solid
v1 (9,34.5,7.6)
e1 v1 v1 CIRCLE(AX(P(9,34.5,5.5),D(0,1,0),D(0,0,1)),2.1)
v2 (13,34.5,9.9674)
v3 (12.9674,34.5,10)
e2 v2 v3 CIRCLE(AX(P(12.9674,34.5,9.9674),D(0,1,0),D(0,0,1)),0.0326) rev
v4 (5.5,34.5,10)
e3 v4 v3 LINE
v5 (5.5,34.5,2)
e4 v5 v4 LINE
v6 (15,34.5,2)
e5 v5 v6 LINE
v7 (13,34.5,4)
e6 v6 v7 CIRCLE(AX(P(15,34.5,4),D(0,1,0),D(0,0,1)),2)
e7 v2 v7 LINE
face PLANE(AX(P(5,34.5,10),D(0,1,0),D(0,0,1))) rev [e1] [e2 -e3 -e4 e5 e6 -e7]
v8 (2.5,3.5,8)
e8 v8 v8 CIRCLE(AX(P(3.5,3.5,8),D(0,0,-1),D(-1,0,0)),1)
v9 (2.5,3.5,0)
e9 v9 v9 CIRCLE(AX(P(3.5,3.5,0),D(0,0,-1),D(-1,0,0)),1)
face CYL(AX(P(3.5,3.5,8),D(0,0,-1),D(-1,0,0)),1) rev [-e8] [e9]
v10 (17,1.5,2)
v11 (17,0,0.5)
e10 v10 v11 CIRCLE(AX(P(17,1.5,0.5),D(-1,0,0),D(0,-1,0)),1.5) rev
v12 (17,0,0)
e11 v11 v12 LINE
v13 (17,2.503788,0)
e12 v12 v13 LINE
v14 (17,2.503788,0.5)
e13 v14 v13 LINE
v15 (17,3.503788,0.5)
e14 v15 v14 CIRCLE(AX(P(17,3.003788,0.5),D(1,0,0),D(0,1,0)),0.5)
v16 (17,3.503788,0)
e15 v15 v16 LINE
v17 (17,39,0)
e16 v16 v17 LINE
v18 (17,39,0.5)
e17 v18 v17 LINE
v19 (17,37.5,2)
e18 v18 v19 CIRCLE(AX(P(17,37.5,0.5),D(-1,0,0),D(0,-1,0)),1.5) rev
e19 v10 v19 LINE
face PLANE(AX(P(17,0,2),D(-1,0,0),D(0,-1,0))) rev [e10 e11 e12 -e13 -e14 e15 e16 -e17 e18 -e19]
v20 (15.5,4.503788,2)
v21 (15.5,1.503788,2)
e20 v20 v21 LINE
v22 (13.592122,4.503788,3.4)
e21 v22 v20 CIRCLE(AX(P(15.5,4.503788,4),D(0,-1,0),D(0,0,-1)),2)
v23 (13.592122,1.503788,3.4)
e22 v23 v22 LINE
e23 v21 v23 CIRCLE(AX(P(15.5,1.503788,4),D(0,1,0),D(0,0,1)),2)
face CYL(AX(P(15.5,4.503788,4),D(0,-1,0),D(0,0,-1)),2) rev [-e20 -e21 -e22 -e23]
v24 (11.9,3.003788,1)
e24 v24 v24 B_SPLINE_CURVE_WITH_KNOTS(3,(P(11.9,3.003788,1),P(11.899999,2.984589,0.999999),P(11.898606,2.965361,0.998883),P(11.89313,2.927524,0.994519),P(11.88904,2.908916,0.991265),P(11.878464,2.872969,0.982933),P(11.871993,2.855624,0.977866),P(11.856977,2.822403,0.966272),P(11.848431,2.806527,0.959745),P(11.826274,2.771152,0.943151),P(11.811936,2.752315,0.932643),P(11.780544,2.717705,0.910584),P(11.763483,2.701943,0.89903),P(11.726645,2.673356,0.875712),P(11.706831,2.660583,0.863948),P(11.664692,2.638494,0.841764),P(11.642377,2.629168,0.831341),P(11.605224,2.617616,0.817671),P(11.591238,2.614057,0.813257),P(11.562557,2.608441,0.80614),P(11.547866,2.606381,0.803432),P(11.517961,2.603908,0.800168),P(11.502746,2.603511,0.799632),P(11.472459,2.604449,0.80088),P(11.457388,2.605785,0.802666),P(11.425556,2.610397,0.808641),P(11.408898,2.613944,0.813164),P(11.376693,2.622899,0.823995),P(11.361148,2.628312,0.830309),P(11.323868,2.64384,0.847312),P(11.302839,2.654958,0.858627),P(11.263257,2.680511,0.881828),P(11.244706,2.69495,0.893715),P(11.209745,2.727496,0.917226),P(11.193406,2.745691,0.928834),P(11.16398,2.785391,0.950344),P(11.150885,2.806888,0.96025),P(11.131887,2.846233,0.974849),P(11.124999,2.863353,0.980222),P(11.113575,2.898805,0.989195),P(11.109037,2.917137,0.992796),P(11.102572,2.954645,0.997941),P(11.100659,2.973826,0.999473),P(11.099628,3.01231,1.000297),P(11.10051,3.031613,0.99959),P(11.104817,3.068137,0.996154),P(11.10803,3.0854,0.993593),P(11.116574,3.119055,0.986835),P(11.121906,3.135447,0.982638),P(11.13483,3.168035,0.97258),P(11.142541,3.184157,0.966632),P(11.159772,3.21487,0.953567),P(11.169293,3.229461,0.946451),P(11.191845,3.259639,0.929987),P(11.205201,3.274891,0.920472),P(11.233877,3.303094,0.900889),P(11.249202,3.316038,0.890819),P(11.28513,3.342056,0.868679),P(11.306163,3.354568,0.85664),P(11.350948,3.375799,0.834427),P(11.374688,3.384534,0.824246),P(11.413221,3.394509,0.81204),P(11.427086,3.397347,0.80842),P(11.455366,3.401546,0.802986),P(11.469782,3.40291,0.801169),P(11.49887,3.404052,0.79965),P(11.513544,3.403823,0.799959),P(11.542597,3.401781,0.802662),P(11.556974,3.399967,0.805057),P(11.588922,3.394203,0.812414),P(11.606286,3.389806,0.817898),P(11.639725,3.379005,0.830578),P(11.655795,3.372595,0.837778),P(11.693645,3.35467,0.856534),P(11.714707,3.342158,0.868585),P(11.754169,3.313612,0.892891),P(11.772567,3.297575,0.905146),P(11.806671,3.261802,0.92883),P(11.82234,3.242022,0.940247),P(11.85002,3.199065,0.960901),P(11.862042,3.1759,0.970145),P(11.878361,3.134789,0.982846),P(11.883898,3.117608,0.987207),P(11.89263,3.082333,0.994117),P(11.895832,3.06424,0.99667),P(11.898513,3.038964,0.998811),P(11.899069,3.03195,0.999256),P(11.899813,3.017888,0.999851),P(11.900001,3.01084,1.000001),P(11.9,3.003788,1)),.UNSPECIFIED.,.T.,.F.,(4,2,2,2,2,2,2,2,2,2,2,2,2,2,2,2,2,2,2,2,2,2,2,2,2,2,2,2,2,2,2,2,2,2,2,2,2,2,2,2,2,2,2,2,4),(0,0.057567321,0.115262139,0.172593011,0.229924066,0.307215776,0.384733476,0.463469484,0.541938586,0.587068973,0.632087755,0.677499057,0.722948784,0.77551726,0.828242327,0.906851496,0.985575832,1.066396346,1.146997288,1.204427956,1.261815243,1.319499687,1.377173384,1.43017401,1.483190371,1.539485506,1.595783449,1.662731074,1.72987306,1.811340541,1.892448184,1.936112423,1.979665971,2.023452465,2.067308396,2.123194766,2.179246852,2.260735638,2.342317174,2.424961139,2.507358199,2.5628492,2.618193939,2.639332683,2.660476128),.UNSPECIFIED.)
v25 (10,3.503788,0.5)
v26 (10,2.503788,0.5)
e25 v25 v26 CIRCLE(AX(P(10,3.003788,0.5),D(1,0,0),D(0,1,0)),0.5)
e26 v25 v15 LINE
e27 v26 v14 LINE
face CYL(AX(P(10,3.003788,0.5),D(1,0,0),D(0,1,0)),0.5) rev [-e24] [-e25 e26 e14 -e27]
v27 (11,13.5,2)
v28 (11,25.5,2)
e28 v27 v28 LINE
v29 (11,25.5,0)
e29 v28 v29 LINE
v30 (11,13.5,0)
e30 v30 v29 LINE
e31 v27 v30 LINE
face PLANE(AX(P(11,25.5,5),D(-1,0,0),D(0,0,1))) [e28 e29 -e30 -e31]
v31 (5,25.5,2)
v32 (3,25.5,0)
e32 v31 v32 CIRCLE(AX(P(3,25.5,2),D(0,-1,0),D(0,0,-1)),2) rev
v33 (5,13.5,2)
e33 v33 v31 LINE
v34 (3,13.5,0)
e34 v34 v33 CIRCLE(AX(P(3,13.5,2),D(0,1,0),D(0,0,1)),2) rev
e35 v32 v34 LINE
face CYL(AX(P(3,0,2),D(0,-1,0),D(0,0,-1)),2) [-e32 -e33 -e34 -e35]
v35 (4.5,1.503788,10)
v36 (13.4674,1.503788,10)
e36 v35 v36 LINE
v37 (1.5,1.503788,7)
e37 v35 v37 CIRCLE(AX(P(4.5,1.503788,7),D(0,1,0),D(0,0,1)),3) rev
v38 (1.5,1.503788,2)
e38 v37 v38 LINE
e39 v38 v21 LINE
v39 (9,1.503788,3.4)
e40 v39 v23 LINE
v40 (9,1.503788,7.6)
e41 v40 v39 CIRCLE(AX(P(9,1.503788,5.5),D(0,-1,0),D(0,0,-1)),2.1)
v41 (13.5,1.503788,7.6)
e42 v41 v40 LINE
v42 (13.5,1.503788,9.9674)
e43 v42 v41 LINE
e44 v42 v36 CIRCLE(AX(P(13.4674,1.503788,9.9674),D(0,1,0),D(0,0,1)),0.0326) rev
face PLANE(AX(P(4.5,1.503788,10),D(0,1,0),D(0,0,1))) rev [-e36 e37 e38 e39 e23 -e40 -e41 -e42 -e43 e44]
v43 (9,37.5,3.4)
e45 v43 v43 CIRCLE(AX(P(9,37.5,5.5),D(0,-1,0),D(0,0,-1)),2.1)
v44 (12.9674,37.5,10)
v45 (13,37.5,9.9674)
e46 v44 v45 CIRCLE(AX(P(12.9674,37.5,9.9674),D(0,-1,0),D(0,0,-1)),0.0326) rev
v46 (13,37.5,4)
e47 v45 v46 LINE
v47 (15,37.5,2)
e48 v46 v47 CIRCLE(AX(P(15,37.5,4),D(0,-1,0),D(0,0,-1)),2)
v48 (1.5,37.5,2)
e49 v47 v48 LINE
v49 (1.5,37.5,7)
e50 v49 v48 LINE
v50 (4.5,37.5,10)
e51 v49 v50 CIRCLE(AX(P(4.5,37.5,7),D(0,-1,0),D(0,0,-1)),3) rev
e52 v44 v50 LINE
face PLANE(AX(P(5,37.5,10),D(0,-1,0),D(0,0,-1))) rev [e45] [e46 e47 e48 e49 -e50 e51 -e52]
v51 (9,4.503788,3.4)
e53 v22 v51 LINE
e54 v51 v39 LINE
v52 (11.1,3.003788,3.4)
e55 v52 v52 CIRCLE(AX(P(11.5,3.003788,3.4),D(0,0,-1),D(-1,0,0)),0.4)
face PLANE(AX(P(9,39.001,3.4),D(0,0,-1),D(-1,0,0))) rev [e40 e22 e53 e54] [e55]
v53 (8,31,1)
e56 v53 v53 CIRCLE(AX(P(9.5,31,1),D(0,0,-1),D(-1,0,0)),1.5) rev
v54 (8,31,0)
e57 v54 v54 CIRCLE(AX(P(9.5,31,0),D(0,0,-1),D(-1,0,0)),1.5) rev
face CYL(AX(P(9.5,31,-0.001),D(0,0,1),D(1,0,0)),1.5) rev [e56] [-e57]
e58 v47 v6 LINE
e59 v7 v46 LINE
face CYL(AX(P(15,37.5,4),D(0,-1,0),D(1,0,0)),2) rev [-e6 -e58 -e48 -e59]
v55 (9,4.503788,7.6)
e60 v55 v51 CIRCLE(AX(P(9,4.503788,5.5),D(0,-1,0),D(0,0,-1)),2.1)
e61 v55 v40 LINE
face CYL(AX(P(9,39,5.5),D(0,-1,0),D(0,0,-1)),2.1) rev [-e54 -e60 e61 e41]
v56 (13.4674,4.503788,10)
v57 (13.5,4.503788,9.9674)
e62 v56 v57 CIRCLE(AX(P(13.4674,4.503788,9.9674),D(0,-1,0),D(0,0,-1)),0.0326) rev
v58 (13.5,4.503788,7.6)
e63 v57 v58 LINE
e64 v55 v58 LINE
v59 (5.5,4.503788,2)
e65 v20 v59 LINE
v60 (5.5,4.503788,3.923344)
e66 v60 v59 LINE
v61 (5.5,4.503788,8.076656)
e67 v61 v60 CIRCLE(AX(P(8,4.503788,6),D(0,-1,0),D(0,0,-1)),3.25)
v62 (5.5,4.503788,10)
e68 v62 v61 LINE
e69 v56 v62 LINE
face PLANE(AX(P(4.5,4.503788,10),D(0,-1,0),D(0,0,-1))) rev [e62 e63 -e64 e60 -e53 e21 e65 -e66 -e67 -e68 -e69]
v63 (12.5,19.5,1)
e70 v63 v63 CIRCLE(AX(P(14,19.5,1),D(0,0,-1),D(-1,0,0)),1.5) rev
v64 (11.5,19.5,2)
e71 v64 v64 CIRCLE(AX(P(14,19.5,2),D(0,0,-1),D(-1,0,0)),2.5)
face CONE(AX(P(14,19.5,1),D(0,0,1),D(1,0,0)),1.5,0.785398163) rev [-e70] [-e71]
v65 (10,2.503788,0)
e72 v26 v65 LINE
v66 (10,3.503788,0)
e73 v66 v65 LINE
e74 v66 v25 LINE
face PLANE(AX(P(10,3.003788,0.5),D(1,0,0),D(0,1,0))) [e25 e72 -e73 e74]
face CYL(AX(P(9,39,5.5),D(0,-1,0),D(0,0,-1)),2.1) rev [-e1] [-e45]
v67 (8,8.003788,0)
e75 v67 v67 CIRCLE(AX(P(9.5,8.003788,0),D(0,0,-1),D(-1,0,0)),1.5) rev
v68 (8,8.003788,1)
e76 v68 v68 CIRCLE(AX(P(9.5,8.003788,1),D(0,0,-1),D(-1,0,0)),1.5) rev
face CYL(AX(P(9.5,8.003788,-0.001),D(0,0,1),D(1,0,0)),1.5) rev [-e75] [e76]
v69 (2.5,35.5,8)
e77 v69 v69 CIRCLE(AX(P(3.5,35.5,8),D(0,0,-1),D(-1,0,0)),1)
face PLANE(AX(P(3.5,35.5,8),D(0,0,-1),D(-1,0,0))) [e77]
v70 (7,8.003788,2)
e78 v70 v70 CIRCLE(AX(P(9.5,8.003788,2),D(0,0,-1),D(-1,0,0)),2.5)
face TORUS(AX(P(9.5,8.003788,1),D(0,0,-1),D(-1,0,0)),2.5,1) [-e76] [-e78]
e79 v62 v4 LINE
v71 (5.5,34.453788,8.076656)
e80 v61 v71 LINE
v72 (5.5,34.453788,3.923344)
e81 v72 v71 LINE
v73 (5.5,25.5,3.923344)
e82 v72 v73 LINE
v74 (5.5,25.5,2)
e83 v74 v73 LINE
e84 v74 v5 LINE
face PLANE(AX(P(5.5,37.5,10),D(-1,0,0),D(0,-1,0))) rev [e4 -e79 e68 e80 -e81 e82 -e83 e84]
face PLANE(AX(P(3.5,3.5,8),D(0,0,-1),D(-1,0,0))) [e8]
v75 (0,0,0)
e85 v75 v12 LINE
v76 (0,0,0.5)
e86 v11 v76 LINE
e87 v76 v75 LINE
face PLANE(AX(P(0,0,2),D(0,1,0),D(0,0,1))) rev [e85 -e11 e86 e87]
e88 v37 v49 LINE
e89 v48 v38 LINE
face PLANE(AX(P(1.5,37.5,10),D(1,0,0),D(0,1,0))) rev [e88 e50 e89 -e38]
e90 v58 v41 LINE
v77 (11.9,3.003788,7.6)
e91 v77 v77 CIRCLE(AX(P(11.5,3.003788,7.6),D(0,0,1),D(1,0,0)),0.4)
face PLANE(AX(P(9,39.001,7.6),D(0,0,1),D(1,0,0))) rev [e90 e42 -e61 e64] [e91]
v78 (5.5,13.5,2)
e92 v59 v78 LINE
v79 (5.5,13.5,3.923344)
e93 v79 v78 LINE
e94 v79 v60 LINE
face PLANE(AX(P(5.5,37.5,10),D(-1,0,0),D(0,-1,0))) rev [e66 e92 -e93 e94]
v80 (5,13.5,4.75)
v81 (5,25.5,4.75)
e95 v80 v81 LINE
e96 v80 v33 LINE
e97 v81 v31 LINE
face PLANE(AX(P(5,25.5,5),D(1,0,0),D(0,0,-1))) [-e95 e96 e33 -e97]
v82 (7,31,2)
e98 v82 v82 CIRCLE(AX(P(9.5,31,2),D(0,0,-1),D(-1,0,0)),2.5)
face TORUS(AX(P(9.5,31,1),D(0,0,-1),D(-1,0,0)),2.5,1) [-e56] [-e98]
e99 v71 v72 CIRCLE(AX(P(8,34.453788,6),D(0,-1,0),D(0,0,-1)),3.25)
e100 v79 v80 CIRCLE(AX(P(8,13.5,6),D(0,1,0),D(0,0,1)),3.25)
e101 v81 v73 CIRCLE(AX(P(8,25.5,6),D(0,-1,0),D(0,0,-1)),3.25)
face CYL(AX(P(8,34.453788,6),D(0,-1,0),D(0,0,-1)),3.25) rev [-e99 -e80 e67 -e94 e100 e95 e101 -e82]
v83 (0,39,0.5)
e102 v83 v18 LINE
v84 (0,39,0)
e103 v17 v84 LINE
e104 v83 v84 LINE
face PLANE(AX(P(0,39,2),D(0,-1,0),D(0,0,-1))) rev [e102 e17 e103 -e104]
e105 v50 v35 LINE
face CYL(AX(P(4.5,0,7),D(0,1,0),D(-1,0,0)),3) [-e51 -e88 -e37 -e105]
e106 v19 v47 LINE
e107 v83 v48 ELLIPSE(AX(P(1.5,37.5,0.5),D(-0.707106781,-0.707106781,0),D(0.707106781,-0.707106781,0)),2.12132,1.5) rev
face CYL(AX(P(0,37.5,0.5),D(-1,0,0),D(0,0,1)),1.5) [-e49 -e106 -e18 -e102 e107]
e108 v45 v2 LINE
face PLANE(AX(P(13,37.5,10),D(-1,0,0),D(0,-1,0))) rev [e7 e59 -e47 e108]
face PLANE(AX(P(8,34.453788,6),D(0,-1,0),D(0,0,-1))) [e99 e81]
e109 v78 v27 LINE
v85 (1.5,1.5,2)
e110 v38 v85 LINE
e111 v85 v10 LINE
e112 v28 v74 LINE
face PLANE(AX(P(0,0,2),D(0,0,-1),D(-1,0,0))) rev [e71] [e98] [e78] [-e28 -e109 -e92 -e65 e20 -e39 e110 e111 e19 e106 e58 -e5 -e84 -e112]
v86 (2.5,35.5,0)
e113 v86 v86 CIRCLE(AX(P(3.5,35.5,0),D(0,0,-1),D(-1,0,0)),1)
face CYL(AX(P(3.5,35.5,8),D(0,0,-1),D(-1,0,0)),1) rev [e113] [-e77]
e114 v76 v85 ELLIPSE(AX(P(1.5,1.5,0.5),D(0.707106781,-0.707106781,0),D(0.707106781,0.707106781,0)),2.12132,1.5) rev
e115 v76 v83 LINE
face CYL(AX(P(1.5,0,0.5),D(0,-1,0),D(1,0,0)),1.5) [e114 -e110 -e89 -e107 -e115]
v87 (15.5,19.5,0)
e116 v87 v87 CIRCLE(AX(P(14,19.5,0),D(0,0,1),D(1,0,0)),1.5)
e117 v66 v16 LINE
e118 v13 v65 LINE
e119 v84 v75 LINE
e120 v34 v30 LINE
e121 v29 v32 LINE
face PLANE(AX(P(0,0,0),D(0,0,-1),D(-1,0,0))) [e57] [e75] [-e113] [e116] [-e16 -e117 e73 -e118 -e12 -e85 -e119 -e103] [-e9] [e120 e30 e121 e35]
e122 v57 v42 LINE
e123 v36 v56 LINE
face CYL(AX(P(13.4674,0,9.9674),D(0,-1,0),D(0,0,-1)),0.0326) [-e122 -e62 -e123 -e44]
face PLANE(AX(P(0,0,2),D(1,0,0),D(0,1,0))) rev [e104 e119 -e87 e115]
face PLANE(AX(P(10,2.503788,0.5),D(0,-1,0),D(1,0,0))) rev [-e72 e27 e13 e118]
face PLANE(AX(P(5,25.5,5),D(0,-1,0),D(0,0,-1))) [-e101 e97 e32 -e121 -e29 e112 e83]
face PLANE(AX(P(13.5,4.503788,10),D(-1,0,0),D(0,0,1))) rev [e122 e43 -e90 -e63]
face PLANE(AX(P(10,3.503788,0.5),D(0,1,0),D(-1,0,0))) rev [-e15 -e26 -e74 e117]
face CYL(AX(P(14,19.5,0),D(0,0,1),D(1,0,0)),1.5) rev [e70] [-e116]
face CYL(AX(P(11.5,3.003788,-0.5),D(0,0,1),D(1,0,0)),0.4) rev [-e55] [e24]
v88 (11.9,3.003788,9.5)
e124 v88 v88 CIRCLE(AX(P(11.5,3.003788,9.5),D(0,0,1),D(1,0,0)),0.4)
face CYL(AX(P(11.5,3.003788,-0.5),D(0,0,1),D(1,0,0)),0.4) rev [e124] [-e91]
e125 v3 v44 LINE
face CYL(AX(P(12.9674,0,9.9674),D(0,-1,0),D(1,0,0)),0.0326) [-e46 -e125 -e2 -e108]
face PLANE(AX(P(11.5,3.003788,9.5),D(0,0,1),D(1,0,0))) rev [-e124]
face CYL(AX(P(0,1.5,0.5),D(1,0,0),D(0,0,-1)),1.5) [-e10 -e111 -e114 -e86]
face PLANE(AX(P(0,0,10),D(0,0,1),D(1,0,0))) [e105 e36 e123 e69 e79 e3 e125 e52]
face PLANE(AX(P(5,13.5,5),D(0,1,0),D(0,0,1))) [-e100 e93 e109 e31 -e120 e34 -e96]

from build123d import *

# Parameters (mm, degrees)
ESQUISSE1_W                  = 17
ESQUISSE1_H                  = 39
BOSS_EXTRU_1_DEPTH           = 2
ESQUISSE2_W                  = 8
ESQUISSE2_H                  = 3
ESQUISSE2_W_2                = 9
BOSS_EXTRU_2_DEPTH           = 8
ESQUISSE3_R                  = 2.1
ENL_V_MAT_EXTRU_1_DEPTH      = 43.367037979
CONG_1_R                     = 0.0326
ESQUISSE14_W                 = 4
ESQUISSE14_H                 = 35.996211904
BOSS_EXTRU_8_DEPTH           = 8
ENL_V_MAT_EXTRU_2_DEPTH      = 3
ENL_V_MAT_EXTRU_2_DEPTH_BACK = 44.289721644
ESQUISSE4_W                  = 6
ESQUISSE4_H                  = 12
ENL_V_START                  = -3
ESQUISSE15_R                 = 3.25
ENL_V_MAT_EXTRU_7_DEPTH      = 29.95
CONG_9_R                     = 3
CONG_10_R                    = 2
CONG_11_R                    = 2
CONG_12_R                    = 1.5
ESQUISSE16_R                 = 1
ENL_V_MAT_EXTRU_8_DEPTH      = 8
ENL_V_MAT_EXTRU_9_REACH      = 44.367
ESQUISSE17_W                 = 6.298788147
ESQUISSE17_H                 = 4.2
ENL_V_START_2                = -0.5
ESQUISSE18_R                 = 0.4
ENL_V_MAT_EXTRU_10_DEPTH     = 10
ENL_V_MAT_EXTRU_18_DEPTH     = 7
ESQUISSE21_R                 = 1.5
ENL_V_MAT_EXTRU_19_DEPTH     = 44.289721683
CHANFREIN1_SIZE              = 1
ENL_V_MAT_EXTRU_20_REACH     = 45.29
ESQUISSE22_R                 = 1.5
CONG_14_R                    = 1


with BuildPart() as part:
    # Esquisse1 → Boss.-Extru.1 (new body)
    with BuildSketch(Plane.XY):
        with Locations((8.5, 19.5)):
            Rectangle(ESQUISSE1_W, ESQUISSE1_H)
    extrude(amount=BOSS_EXTRU_1_DEPTH)

    # Esquisse2 → Boss.-Extru.2 (add)
    with BuildSketch(Plane.XY.offset(2)):
        with Locations((9, 36)):
            Rectangle(ESQUISSE2_W, ESQUISSE2_H)
        with Locations((9, 3.003788096)):
            Rectangle(ESQUISSE2_W_2, ESQUISSE2_H)
    extrude(amount=BOSS_EXTRU_2_DEPTH)

    # Esquisse3 → Enlèv. mat.-Extru.1 (cut, through all)
    with BuildSketch(Plane.XZ.offset(-1.503788096)):
        with Locations(Location((9, 5.5, 0), (0, 0, 270))):
            Circle(ESQUISSE3_R)
    extrude(amount=-ENL_V_MAT_EXTRU_1_DEPTH, mode=Mode.SUBTRACT)

    # Congé1
    cong_1_edges = [part.edges().sort_by_distance(p)[0] for p in [
        (13, 36, 10),
        (13.5, 3.003788096, 10),
    ]]
    fillet(cong_1_edges, radius=CONG_1_R)

    # Esquisse14 → Boss.-Extru.8 (add)
    with BuildSketch(Plane.XY.offset(2)):
        with Locations((3.5, 19.501894048)):
            Rectangle(ESQUISSE14_W, ESQUISSE14_H)
    extrude(amount=BOSS_EXTRU_8_DEPTH)

    # Esquisse4 → Enlèv. mat.-Extru.2 (cut, two sides: drawn at the far end of the back side and taken through both)
    with BuildSketch(Plane.XY.offset(2).offset(-ENL_V_MAT_EXTRU_2_DEPTH_BACK)):
        with Locations((8, 19.5)):
            Rectangle(ESQUISSE4_W, ESQUISSE4_H)
    extrude(amount=ENL_V_MAT_EXTRU_2_DEPTH + ENL_V_MAT_EXTRU_2_DEPTH_BACK, mode=Mode.SUBTRACT)

    # Esquisse15 → Enlèv. mat.-Extru.7 (cut)
    with BuildSketch(Plane.XZ.offset(-1.503788096).offset(ENL_V_START)):
        with Locations((8, 6)):
            Circle(ESQUISSE15_R)
    extrude(amount=-ENL_V_MAT_EXTRU_7_DEPTH, mode=Mode.SUBTRACT)

    # Congé9
    cong_9_edges = [part.edges().sort_by_distance(p)[0] for p in [
        (1.5, 19.501894048, 10),
    ]]
    fillet(cong_9_edges, radius=CONG_9_R)

    # Congé10
    cong_10_edges = [part.edges().sort_by_distance(p)[0] for p in [
        (5, 19.5, 0),
    ]]
    fillet(cong_10_edges, radius=CONG_10_R)

    # Congé11
    cong_11_edges = [part.edges().sort_by_distance(p)[0] for p in [
        (13, 36, 2),
        (13.5, 3.003788096, 2),
    ]]
    fillet(cong_11_edges, radius=CONG_11_R)

    # Congé12
    cong_12_edges = [part.edges().sort_by_distance(p)[0] for p in [
        (8.5, 39, 2),
        (0, 19.5, 2),
        (8.5, 0, 2),
    ]]
    fillet(cong_12_edges, radius=CONG_12_R - 0.0001)  # a hair under: the kernel refuses the full size

    # Esquisse16 → Enlèv. mat.-Extru.8 (cut)
    with BuildSketch(Plane(origin=(0, 0, 0), x_dir=(-1, 0, 0), z_dir=(0, 0, -1))):
        with Locations((-3.5, 35.5)):
            Circle(ESQUISSE16_R)
        with Locations((-3.5, 3.5)):
            Circle(ESQUISSE16_R)
    extrude(amount=-ENL_V_MAT_EXTRU_8_DEPTH, mode=Mode.SUBTRACT)

    # Esquisse17 → Enlèv. mat.-Extru.9 (cut, up to next)
    with BuildSketch(Plane.XZ.offset(-1.503788096), mode=Mode.PRIVATE) as enl_v_mat_extru_9_sk1:
        with Locations((12.149394074, 5.5)):
            Rectangle(ESQUISSE17_W, ESQUISSE17_H)
    enl_v_mat_extru_9_tool1 = extrude(enl_v_mat_extru_9_sk1.sketch, amount=-ENL_V_MAT_EXTRU_9_REACH, mode=Mode.PRIVATE) & part.part
    add(enl_v_mat_extru_9_tool1.solids().sort_by_distance((12.149394, 1.503788, 5.5))[0], mode=Mode.SUBTRACT)

    # Esquisse18 → Enlèv. mat.-Extru.10 (cut)
    with BuildSketch(Plane.XY.offset(10).offset(ENL_V_START_2)):
        with Locations((11.5, 3.003788096)):
            Circle(ESQUISSE18_R)
    extrude(amount=-ENL_V_MAT_EXTRU_10_DEPTH, mode=Mode.SUBTRACT)

    # Esquisse20 → Enlèv. mat.-Extru.18 (cut)
    with BuildSketch(Plane(origin=(17, 0, 0), x_dir=(0, 0, -1), z_dir=(1, 0, 0))):
        with BuildLine():
            Line((-0.5, 3.503788096), (1.040895872, 3.503788096))
            ThreePointArc((1.040895872, 3.503788096), (1.540895872, 3.003788096), (1.040895872, 2.503788096))
            Line((1.040895872, 2.503788096), (-0.5, 2.503788096))
            ThreePointArc((-0.5, 2.503788096), (-1, 3.003788096), (-0.5, 3.503788096))
        make_face()
    extrude(amount=-ENL_V_MAT_EXTRU_18_DEPTH, mode=Mode.SUBTRACT)

    # Esquisse21 → Enlèv. mat.-Extru.19 (cut, through all)
    with BuildSketch(Plane.XY.offset(2)):
        with Locations((14, 19.5)):
            Circle(ESQUISSE21_R)
    extrude(amount=-ENL_V_MAT_EXTRU_19_DEPTH, mode=Mode.SUBTRACT)

    # Chanfrein1
    chanfrein1_edges = [part.edges().sort_by_distance(p)[0] for p in [
        (12.5, 19.5, 2),
    ]]
    chamfer(chanfrein1_edges, length=CHANFREIN1_SIZE)

    # Esquisse22 → Enlèv. mat.-Extru.20 (cut, up to next)
    with BuildSketch(Plane.XY.offset(2), mode=Mode.PRIVATE) as enl_v_mat_extru_20_sk1:
        with Locations((9.5, 31)):
            Circle(ESQUISSE22_R)
    enl_v_mat_extru_20_tool1 = extrude(enl_v_mat_extru_20_sk1.sketch, amount=-ENL_V_MAT_EXTRU_20_REACH, mode=Mode.PRIVATE) & part.part
    # Esquisse22 → Enlèv. mat.-Extru.20 (cut, up to next)
    with BuildSketch(Plane.XY.offset(2), mode=Mode.PRIVATE) as enl_v_mat_extru_20_sk2:
        with Locations((9.5, 8.003788096)):
            Circle(ESQUISSE22_R)
    enl_v_mat_extru_20_tool2 = extrude(enl_v_mat_extru_20_sk2.sketch, amount=-ENL_V_MAT_EXTRU_20_REACH, mode=Mode.PRIVATE) & part.part
    add(enl_v_mat_extru_20_tool1.solids().sort_by_distance((9.5, 31, 2))[0], mode=Mode.SUBTRACT)
    add(enl_v_mat_extru_20_tool2.solids().sort_by_distance((9.5, 8.003788, 2))[0], mode=Mode.SUBTRACT)

    # Congé14
    cong_14_edges = [part.edges().sort_by_distance(p)[0] for p in [
        (8, 31, 2),
        (8, 8.003788096, 2),
    ]]
    fillet(cong_14_edges, radius=CONG_14_R)


solid = part.part
